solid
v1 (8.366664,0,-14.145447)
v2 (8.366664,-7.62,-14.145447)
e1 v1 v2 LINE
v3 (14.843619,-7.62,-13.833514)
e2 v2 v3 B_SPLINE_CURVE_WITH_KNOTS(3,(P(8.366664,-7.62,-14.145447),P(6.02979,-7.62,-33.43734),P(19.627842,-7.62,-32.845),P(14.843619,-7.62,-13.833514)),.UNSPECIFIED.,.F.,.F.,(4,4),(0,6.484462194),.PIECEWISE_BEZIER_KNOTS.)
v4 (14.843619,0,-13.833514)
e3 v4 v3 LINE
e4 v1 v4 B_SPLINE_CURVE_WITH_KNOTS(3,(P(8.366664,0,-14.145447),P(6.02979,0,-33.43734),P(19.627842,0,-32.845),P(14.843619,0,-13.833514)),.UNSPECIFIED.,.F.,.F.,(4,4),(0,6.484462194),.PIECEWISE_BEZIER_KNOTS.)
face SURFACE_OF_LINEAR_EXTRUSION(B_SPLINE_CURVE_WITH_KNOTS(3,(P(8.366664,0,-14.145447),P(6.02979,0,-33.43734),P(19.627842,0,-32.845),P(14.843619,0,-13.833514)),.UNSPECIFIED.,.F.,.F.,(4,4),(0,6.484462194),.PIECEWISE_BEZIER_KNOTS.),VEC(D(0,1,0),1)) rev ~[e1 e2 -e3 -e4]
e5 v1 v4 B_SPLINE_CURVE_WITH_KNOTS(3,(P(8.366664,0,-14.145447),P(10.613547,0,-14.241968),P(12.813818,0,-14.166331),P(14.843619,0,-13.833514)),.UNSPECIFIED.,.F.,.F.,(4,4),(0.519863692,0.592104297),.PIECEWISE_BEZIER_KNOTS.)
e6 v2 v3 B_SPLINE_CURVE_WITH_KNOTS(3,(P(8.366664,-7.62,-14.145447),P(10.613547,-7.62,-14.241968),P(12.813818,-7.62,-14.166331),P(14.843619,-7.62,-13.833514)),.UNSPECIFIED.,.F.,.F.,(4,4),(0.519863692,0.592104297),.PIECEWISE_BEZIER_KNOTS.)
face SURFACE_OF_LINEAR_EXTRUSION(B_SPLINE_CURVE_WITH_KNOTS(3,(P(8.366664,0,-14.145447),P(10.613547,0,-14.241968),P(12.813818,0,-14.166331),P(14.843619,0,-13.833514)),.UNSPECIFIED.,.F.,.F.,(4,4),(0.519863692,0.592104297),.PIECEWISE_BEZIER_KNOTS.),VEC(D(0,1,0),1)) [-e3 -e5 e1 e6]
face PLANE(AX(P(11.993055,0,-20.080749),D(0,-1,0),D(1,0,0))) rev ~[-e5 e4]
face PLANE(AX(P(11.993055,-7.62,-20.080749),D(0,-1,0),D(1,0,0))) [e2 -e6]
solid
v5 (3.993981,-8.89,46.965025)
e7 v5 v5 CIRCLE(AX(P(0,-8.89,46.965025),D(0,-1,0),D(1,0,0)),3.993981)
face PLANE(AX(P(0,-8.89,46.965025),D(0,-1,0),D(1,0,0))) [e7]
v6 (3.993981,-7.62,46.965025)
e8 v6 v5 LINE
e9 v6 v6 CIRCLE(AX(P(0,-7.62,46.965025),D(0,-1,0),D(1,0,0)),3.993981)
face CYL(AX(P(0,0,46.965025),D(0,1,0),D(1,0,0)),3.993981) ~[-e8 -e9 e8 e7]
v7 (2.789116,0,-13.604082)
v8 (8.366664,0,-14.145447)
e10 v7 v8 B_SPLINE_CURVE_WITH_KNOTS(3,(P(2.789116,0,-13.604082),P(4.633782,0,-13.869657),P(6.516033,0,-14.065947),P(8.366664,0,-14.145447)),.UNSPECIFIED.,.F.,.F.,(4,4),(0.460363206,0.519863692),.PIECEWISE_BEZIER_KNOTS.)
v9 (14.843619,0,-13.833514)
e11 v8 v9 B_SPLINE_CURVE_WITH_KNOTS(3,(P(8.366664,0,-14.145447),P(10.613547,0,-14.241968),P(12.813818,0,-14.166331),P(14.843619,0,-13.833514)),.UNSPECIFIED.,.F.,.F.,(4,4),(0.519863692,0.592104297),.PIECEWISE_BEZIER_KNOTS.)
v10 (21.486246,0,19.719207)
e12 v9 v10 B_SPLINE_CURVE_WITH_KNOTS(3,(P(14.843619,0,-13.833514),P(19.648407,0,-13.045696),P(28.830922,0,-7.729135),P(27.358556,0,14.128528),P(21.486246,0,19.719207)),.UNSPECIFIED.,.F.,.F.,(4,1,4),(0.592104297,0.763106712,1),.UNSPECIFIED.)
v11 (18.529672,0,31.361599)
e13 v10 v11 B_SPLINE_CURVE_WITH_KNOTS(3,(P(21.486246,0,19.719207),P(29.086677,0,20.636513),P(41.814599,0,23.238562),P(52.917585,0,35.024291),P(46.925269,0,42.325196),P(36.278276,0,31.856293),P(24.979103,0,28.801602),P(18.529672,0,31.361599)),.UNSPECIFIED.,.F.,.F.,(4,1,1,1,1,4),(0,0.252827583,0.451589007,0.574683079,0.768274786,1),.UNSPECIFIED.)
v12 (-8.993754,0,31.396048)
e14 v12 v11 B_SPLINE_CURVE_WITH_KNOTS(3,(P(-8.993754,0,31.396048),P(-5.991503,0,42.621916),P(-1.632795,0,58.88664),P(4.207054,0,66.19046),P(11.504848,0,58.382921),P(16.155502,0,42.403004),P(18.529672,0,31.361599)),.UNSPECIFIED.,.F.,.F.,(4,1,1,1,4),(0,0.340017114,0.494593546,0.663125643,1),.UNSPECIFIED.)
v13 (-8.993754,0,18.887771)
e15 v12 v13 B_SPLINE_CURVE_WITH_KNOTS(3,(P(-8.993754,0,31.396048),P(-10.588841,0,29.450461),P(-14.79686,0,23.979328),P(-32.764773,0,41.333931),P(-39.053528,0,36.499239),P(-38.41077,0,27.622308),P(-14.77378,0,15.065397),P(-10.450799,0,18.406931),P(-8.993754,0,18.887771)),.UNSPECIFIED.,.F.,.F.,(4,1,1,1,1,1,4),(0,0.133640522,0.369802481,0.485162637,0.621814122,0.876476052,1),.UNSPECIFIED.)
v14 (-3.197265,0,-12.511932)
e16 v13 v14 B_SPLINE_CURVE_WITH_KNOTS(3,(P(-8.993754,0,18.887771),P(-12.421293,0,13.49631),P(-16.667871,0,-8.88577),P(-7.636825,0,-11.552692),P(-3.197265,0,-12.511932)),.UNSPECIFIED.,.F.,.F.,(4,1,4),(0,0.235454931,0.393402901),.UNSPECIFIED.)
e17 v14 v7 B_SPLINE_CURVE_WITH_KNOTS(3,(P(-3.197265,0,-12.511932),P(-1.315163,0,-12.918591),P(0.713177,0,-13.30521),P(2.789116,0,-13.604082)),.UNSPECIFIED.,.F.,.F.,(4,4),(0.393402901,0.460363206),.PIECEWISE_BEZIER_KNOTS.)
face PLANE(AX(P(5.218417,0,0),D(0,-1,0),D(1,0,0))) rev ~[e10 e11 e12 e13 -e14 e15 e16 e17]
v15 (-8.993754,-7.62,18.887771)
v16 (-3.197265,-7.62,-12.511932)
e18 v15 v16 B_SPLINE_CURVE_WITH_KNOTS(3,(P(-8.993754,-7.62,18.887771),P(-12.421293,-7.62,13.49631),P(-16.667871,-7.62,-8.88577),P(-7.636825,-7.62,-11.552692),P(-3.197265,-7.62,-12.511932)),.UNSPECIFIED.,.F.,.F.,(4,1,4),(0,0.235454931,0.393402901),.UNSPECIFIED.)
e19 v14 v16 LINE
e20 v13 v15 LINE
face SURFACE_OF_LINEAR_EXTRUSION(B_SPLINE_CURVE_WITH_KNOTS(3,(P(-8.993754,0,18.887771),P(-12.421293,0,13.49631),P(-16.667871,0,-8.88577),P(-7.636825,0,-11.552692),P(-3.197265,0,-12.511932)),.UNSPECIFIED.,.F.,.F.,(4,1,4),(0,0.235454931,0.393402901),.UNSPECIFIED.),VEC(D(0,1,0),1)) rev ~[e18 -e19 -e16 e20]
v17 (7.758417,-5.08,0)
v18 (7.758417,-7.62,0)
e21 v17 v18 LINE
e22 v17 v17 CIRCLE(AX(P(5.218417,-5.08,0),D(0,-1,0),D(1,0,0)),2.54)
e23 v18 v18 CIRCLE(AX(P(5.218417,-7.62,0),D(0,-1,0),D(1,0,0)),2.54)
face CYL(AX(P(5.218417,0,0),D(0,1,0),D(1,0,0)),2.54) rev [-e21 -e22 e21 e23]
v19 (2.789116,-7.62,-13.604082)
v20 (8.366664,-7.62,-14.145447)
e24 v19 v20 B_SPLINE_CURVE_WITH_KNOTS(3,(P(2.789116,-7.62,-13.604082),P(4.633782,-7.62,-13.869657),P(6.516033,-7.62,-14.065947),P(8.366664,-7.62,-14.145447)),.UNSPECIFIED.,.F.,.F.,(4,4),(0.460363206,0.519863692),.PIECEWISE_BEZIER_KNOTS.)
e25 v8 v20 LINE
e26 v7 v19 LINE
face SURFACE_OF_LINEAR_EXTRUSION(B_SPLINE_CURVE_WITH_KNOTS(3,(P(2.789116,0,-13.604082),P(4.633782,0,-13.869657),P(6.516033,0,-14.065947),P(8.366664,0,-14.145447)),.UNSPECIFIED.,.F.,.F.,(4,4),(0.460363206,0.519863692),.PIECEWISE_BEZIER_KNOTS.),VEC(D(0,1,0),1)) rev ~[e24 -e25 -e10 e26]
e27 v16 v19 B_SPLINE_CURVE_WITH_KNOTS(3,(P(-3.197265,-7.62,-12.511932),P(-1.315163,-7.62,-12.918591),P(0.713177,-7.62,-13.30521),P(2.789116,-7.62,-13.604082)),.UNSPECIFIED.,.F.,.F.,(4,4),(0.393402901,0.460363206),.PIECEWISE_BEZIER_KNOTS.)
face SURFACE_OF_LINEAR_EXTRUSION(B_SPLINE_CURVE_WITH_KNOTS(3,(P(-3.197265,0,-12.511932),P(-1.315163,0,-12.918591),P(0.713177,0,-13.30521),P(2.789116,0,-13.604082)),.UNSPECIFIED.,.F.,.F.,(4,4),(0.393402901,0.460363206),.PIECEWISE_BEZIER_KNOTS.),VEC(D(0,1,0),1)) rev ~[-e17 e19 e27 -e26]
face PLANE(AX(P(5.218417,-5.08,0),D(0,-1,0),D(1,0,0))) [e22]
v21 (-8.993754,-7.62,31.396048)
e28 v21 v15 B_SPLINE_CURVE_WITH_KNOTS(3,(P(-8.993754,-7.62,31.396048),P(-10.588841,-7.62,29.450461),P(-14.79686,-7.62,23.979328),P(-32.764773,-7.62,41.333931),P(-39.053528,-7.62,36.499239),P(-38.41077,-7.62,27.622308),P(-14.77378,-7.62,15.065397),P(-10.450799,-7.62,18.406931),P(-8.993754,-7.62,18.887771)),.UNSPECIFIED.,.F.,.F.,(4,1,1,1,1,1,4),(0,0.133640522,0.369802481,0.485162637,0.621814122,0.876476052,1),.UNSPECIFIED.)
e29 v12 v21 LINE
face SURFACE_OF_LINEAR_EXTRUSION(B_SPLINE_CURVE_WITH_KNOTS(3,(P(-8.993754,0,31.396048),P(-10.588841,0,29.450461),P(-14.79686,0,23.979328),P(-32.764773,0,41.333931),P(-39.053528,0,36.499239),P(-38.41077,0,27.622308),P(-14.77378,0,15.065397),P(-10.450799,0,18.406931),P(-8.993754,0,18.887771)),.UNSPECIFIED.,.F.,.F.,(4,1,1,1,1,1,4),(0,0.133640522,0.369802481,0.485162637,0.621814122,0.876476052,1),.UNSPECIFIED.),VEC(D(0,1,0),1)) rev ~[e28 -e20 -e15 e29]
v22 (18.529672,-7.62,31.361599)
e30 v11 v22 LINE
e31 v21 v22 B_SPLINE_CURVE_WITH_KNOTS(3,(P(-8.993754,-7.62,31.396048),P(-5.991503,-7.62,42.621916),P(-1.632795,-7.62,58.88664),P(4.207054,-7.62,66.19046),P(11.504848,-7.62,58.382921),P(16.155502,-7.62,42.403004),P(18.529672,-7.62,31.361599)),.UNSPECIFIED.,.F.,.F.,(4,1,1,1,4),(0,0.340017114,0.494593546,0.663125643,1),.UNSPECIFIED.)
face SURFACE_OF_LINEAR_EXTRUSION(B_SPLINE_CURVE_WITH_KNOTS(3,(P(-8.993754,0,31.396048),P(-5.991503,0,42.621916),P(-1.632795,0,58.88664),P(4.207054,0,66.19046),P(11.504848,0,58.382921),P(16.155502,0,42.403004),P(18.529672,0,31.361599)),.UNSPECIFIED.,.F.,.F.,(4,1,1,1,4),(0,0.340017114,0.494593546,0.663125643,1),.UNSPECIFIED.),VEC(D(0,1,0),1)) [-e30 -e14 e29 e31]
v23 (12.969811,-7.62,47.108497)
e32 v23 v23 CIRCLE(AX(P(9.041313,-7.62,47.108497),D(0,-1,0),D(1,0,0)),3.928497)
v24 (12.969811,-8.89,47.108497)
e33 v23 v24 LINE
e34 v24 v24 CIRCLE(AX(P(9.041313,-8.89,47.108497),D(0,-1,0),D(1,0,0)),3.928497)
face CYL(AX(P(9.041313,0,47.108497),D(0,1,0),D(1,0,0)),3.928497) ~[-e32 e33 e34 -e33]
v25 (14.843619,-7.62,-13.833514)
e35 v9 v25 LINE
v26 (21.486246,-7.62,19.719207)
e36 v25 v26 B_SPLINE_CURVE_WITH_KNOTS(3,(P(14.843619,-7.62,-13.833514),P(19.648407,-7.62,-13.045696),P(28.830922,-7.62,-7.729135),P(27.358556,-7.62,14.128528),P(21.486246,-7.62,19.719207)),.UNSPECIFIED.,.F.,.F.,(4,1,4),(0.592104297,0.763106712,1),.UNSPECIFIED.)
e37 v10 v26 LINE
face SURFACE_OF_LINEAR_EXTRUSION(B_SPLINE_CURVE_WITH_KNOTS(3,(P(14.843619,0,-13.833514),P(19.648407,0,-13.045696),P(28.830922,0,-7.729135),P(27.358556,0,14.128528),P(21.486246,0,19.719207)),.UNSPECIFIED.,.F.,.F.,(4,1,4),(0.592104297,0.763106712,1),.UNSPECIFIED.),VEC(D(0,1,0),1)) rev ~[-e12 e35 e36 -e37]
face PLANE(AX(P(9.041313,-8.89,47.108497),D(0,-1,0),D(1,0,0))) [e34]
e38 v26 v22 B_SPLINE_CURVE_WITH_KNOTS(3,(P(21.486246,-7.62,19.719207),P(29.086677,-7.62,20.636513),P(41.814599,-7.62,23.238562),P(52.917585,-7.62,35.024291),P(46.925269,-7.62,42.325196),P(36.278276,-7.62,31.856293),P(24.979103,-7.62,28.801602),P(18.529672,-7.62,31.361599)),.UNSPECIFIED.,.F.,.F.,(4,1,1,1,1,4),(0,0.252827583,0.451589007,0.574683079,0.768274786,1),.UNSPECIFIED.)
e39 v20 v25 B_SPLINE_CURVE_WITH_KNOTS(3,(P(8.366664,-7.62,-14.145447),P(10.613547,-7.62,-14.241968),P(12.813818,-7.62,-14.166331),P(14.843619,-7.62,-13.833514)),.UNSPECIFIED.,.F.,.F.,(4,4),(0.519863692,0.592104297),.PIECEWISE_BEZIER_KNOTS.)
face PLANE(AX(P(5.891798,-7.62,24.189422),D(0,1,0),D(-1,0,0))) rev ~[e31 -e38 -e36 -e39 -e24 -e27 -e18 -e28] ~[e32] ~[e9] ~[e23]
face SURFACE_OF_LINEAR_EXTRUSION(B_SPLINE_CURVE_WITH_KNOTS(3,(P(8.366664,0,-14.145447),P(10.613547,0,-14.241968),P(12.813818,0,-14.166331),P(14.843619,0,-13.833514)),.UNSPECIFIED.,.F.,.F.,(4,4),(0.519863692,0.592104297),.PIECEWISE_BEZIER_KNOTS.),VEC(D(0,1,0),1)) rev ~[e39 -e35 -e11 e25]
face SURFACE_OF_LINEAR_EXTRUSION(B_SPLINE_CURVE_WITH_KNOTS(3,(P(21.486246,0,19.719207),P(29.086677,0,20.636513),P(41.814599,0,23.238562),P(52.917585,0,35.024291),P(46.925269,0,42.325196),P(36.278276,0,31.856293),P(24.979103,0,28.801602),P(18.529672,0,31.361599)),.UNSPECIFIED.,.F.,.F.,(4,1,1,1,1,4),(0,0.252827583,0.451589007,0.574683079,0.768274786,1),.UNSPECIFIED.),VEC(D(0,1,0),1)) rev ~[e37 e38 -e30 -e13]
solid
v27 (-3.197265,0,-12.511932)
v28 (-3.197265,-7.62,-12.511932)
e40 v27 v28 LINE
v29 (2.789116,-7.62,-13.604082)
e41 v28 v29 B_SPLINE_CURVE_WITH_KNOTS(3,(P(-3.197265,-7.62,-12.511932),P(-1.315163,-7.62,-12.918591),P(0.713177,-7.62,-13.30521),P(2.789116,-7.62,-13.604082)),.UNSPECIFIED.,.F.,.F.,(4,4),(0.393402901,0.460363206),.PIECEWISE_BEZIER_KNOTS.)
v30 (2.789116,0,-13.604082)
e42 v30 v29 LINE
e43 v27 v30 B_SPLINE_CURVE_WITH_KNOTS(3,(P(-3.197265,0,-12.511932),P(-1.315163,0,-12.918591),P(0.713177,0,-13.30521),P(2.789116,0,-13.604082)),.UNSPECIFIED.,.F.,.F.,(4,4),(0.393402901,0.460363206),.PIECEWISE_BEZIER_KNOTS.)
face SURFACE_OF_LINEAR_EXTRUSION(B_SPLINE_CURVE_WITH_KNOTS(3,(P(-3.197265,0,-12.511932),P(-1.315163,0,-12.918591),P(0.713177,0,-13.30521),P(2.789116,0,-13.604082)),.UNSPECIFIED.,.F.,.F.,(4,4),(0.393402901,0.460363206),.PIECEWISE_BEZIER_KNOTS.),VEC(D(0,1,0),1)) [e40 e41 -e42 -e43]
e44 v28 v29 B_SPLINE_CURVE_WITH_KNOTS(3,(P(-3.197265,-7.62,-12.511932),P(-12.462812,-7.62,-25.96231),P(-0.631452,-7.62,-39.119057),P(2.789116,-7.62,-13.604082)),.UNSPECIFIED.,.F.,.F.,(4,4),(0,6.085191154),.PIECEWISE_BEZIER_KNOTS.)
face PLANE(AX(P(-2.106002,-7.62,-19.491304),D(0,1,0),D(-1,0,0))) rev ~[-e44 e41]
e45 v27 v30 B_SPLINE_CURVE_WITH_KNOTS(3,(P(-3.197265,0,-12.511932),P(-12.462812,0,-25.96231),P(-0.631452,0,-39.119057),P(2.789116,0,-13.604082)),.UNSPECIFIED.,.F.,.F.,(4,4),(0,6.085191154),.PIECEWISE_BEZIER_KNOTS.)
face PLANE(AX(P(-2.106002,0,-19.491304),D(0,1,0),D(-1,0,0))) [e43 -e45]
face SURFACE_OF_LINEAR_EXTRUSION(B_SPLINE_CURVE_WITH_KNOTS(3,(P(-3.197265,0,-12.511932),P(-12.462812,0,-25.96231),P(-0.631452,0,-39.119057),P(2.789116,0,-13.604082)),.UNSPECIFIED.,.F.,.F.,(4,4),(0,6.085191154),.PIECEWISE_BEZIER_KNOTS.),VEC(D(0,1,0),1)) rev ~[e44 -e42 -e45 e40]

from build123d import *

# Parameters (mm, degrees)
F1_DEPTH = 7.62
F0_R     = 2.54
F0_R_2   = 3.9939806537
F0_R_3   = 3.9284974706
F2_DEPTH = 7.62
F3_DEPTH = 5.08
F4_DEPTH = 8.89


# Not quite as in the source:
# - the program builds the solid bodies; features that only make, move or delete a surface that nothing else refers to are left out


with BuildPart() as f1:
    # F0 (on Front) → F1 (new body)
    with BuildSketch(Plane.XZ):
        with BuildLine():
            add(Edge.make_bspline(
                [(8.3666636462, -14.1454465296), (6.029789649, -33.4373401662), (19.6278417799, -32.8450004155), (14.8436188205, -13.8335144685)],
                knots=[0, 0, 0, 0, 6.4844621936, 6.4844621936, 6.4844621936, 6.4844621936], degree=3))
            add(Edge.make_bspline(
                [(8.3666636462, -14.1454465296), (10.6135470113, -14.2419683118), (12.8138183967, -14.1663312208), (14.8436188205, -13.8335144685)],
                knots=[0.5198636917, 0.5198636917, 0.5198636917, 0.5198636917, 0.5921042973, 0.5921042973, 0.5921042973, 0.5921042973], degree=3))
        make_face()
    extrude(amount=F1_DEPTH)


with BuildPart() as f1b:
    # F0 (on Front) → F1, piece 2 (new body)
    with BuildSketch(Plane.XZ):
        with BuildLine():
            add(Edge.make_bspline(
                [(-3.1972652372, -12.5119319602), (-1.3151625577, -12.9185913113), (0.7131765353, -13.3052102147), (2.7891159978, -13.6040817179)],
                knots=[0.3934029012, 0.3934029012, 0.3934029012, 0.3934029012, 0.4603632064, 0.4603632064, 0.4603632064, 0.4603632064], degree=3))
            add(Edge.make_bspline(
                [(-3.1972652372, -12.5119319602), (-12.462811752, -25.9623099587), (-0.6314517375, -39.1190569146), (2.7891159978, -13.6040817179)],
                knots=[0, 0, 0, 0, 6.0851911542, 6.0851911542, 6.0851911542, 6.0851911542], degree=3))
        make_face()
    extrude(amount=F1_DEPTH)


with BuildPart() as f2:
    # F0 (on Front) → F2 (new body)
    with BuildSketch(Plane.XZ):
        with BuildLine():
            add(Edge.make_bspline(
                [(-8.9937544885, 31.3960482013), (-5.9915025392, 42.6219161305), (-1.6327954119, 58.8866397675), (4.2070541108, 66.1904595846), (11.504848366, 58.3829205052), (16.1555024803, 42.4030038871), (18.5296721756, 31.3615985215)],
                knots=[0, 0, 0, 0, 0.3400171135, 0.4945935455, 0.6631256428, 1, 1, 1, 1], degree=3))
            add(Edge.make_bspline(
                [(-8.9937544885, 31.3960482013), (-10.588841216, 29.4504608313), (-14.7968603022, 23.9793284468), (-32.7647731978, 41.3339309758), (-39.0535280955, 36.4992386423), (-38.4107698736, 27.6223081289), (-14.7737804344, 15.065397303), (-10.4507993177, 18.4069307098), (-8.9937544885, 18.8877706602)],
                knots=[0, 0, 0, 0, 0.1336405217, 0.3698024812, 0.4851626371, 0.6218141221, 0.8764760522, 1, 1, 1, 1], degree=3))
            add(Edge.make_bspline(
                [(-8.9937544885, 18.8877706602), (-12.4212934669, 13.4963097912), (-16.6678709626, -8.8857696906), (-7.6368253061, -11.5526917252), (-3.1972652372, -12.5119319602)],
                knots=[0, 0, 0, 0, 0.2354549315, 0.3934029012, 0.3934029012, 0.3934029012, 0.3934029012], degree=3))
            add(Edge.make_bspline(
                [(-3.1972652372, -12.5119319602), (-1.3151625577, -12.9185913113), (0.7131765353, -13.3052102147), (2.7891159978, -13.6040817179)],
                knots=[0.3934029012, 0.3934029012, 0.3934029012, 0.3934029012, 0.4603632064, 0.4603632064, 0.4603632064, 0.4603632064], degree=3))
            add(Edge.make_bspline(
                [(2.7891159978, -13.6040817179), (4.6337821072, -13.8696569638), (6.5160333844, -14.0659470175), (8.3666636462, -14.1454465296)],
                knots=[0.4603632064, 0.4603632064, 0.4603632064, 0.4603632064, 0.5198636917, 0.5198636917, 0.5198636917, 0.5198636917], degree=3))
            add(Edge.make_bspline(
                [(8.3666636462, -14.1454465296), (10.6135470113, -14.2419683118), (12.8138183967, -14.1663312208), (14.8436188205, -13.8335144685)],
                knots=[0.5198636917, 0.5198636917, 0.5198636917, 0.5198636917, 0.5921042973, 0.5921042973, 0.5921042973, 0.5921042973], degree=3))
            add(Edge.make_bspline(
                [(14.8436188205, -13.8335144685), (19.6484065411, -13.0456962052), (28.8309215091, -7.7291347863), (27.3585564429, 14.128528491), (21.4862455115, 19.7192072701)],
                knots=[0.5921042973, 0.5921042973, 0.5921042973, 0.5921042973, 0.7631067124, 1, 1, 1, 1], degree=3))
            add(Edge.make_bspline(
                [(21.4862455115, 19.7192072701), (29.0866769589, 20.6365127573), (41.8145994621, 23.2385623251), (52.9175854534, 35.024291152), (46.9252690596, 42.3251964725), (36.2782758063, 31.856292713), (24.9791030222, 28.8016016367), (18.5296721756, 31.3615985215)],
                knots=[0, 0, 0, 0, 0.2528275832, 0.4515890066, 0.574683079, 0.7682747861, 1, 1, 1, 1], degree=3))
        make_face()
        with Locations((5.2184173837, 0)):
            Circle(F0_R, mode=Mode.SUBTRACT)
        with Locations((0, 46.9650253654)):
            Circle(F0_R_2, mode=Mode.SUBTRACT)
        with Locations((9.041313082, 47.1084974706)):
            Circle(F0_R_3, mode=Mode.SUBTRACT)
    extrude(amount=F2_DEPTH)

    # F0 (on Front) → F3 (join)
    with BuildSketch(Plane.XZ):
        with Locations((5.2184173837, 0)):
            Circle(F0_R)
    extrude(amount=F3_DEPTH)

    # F0 (on Front) → F4 (join)
    with BuildSketch(Plane.XZ):
        with Locations((0, 46.9650253654)):
            Circle(F0_R_2)
        with Locations((9.041313082, 47.1084974706)):
            Circle(F0_R_3)
    extrude(amount=F4_DEPTH)


solid = Compound([f1.part, f1b.part, f2.part])
